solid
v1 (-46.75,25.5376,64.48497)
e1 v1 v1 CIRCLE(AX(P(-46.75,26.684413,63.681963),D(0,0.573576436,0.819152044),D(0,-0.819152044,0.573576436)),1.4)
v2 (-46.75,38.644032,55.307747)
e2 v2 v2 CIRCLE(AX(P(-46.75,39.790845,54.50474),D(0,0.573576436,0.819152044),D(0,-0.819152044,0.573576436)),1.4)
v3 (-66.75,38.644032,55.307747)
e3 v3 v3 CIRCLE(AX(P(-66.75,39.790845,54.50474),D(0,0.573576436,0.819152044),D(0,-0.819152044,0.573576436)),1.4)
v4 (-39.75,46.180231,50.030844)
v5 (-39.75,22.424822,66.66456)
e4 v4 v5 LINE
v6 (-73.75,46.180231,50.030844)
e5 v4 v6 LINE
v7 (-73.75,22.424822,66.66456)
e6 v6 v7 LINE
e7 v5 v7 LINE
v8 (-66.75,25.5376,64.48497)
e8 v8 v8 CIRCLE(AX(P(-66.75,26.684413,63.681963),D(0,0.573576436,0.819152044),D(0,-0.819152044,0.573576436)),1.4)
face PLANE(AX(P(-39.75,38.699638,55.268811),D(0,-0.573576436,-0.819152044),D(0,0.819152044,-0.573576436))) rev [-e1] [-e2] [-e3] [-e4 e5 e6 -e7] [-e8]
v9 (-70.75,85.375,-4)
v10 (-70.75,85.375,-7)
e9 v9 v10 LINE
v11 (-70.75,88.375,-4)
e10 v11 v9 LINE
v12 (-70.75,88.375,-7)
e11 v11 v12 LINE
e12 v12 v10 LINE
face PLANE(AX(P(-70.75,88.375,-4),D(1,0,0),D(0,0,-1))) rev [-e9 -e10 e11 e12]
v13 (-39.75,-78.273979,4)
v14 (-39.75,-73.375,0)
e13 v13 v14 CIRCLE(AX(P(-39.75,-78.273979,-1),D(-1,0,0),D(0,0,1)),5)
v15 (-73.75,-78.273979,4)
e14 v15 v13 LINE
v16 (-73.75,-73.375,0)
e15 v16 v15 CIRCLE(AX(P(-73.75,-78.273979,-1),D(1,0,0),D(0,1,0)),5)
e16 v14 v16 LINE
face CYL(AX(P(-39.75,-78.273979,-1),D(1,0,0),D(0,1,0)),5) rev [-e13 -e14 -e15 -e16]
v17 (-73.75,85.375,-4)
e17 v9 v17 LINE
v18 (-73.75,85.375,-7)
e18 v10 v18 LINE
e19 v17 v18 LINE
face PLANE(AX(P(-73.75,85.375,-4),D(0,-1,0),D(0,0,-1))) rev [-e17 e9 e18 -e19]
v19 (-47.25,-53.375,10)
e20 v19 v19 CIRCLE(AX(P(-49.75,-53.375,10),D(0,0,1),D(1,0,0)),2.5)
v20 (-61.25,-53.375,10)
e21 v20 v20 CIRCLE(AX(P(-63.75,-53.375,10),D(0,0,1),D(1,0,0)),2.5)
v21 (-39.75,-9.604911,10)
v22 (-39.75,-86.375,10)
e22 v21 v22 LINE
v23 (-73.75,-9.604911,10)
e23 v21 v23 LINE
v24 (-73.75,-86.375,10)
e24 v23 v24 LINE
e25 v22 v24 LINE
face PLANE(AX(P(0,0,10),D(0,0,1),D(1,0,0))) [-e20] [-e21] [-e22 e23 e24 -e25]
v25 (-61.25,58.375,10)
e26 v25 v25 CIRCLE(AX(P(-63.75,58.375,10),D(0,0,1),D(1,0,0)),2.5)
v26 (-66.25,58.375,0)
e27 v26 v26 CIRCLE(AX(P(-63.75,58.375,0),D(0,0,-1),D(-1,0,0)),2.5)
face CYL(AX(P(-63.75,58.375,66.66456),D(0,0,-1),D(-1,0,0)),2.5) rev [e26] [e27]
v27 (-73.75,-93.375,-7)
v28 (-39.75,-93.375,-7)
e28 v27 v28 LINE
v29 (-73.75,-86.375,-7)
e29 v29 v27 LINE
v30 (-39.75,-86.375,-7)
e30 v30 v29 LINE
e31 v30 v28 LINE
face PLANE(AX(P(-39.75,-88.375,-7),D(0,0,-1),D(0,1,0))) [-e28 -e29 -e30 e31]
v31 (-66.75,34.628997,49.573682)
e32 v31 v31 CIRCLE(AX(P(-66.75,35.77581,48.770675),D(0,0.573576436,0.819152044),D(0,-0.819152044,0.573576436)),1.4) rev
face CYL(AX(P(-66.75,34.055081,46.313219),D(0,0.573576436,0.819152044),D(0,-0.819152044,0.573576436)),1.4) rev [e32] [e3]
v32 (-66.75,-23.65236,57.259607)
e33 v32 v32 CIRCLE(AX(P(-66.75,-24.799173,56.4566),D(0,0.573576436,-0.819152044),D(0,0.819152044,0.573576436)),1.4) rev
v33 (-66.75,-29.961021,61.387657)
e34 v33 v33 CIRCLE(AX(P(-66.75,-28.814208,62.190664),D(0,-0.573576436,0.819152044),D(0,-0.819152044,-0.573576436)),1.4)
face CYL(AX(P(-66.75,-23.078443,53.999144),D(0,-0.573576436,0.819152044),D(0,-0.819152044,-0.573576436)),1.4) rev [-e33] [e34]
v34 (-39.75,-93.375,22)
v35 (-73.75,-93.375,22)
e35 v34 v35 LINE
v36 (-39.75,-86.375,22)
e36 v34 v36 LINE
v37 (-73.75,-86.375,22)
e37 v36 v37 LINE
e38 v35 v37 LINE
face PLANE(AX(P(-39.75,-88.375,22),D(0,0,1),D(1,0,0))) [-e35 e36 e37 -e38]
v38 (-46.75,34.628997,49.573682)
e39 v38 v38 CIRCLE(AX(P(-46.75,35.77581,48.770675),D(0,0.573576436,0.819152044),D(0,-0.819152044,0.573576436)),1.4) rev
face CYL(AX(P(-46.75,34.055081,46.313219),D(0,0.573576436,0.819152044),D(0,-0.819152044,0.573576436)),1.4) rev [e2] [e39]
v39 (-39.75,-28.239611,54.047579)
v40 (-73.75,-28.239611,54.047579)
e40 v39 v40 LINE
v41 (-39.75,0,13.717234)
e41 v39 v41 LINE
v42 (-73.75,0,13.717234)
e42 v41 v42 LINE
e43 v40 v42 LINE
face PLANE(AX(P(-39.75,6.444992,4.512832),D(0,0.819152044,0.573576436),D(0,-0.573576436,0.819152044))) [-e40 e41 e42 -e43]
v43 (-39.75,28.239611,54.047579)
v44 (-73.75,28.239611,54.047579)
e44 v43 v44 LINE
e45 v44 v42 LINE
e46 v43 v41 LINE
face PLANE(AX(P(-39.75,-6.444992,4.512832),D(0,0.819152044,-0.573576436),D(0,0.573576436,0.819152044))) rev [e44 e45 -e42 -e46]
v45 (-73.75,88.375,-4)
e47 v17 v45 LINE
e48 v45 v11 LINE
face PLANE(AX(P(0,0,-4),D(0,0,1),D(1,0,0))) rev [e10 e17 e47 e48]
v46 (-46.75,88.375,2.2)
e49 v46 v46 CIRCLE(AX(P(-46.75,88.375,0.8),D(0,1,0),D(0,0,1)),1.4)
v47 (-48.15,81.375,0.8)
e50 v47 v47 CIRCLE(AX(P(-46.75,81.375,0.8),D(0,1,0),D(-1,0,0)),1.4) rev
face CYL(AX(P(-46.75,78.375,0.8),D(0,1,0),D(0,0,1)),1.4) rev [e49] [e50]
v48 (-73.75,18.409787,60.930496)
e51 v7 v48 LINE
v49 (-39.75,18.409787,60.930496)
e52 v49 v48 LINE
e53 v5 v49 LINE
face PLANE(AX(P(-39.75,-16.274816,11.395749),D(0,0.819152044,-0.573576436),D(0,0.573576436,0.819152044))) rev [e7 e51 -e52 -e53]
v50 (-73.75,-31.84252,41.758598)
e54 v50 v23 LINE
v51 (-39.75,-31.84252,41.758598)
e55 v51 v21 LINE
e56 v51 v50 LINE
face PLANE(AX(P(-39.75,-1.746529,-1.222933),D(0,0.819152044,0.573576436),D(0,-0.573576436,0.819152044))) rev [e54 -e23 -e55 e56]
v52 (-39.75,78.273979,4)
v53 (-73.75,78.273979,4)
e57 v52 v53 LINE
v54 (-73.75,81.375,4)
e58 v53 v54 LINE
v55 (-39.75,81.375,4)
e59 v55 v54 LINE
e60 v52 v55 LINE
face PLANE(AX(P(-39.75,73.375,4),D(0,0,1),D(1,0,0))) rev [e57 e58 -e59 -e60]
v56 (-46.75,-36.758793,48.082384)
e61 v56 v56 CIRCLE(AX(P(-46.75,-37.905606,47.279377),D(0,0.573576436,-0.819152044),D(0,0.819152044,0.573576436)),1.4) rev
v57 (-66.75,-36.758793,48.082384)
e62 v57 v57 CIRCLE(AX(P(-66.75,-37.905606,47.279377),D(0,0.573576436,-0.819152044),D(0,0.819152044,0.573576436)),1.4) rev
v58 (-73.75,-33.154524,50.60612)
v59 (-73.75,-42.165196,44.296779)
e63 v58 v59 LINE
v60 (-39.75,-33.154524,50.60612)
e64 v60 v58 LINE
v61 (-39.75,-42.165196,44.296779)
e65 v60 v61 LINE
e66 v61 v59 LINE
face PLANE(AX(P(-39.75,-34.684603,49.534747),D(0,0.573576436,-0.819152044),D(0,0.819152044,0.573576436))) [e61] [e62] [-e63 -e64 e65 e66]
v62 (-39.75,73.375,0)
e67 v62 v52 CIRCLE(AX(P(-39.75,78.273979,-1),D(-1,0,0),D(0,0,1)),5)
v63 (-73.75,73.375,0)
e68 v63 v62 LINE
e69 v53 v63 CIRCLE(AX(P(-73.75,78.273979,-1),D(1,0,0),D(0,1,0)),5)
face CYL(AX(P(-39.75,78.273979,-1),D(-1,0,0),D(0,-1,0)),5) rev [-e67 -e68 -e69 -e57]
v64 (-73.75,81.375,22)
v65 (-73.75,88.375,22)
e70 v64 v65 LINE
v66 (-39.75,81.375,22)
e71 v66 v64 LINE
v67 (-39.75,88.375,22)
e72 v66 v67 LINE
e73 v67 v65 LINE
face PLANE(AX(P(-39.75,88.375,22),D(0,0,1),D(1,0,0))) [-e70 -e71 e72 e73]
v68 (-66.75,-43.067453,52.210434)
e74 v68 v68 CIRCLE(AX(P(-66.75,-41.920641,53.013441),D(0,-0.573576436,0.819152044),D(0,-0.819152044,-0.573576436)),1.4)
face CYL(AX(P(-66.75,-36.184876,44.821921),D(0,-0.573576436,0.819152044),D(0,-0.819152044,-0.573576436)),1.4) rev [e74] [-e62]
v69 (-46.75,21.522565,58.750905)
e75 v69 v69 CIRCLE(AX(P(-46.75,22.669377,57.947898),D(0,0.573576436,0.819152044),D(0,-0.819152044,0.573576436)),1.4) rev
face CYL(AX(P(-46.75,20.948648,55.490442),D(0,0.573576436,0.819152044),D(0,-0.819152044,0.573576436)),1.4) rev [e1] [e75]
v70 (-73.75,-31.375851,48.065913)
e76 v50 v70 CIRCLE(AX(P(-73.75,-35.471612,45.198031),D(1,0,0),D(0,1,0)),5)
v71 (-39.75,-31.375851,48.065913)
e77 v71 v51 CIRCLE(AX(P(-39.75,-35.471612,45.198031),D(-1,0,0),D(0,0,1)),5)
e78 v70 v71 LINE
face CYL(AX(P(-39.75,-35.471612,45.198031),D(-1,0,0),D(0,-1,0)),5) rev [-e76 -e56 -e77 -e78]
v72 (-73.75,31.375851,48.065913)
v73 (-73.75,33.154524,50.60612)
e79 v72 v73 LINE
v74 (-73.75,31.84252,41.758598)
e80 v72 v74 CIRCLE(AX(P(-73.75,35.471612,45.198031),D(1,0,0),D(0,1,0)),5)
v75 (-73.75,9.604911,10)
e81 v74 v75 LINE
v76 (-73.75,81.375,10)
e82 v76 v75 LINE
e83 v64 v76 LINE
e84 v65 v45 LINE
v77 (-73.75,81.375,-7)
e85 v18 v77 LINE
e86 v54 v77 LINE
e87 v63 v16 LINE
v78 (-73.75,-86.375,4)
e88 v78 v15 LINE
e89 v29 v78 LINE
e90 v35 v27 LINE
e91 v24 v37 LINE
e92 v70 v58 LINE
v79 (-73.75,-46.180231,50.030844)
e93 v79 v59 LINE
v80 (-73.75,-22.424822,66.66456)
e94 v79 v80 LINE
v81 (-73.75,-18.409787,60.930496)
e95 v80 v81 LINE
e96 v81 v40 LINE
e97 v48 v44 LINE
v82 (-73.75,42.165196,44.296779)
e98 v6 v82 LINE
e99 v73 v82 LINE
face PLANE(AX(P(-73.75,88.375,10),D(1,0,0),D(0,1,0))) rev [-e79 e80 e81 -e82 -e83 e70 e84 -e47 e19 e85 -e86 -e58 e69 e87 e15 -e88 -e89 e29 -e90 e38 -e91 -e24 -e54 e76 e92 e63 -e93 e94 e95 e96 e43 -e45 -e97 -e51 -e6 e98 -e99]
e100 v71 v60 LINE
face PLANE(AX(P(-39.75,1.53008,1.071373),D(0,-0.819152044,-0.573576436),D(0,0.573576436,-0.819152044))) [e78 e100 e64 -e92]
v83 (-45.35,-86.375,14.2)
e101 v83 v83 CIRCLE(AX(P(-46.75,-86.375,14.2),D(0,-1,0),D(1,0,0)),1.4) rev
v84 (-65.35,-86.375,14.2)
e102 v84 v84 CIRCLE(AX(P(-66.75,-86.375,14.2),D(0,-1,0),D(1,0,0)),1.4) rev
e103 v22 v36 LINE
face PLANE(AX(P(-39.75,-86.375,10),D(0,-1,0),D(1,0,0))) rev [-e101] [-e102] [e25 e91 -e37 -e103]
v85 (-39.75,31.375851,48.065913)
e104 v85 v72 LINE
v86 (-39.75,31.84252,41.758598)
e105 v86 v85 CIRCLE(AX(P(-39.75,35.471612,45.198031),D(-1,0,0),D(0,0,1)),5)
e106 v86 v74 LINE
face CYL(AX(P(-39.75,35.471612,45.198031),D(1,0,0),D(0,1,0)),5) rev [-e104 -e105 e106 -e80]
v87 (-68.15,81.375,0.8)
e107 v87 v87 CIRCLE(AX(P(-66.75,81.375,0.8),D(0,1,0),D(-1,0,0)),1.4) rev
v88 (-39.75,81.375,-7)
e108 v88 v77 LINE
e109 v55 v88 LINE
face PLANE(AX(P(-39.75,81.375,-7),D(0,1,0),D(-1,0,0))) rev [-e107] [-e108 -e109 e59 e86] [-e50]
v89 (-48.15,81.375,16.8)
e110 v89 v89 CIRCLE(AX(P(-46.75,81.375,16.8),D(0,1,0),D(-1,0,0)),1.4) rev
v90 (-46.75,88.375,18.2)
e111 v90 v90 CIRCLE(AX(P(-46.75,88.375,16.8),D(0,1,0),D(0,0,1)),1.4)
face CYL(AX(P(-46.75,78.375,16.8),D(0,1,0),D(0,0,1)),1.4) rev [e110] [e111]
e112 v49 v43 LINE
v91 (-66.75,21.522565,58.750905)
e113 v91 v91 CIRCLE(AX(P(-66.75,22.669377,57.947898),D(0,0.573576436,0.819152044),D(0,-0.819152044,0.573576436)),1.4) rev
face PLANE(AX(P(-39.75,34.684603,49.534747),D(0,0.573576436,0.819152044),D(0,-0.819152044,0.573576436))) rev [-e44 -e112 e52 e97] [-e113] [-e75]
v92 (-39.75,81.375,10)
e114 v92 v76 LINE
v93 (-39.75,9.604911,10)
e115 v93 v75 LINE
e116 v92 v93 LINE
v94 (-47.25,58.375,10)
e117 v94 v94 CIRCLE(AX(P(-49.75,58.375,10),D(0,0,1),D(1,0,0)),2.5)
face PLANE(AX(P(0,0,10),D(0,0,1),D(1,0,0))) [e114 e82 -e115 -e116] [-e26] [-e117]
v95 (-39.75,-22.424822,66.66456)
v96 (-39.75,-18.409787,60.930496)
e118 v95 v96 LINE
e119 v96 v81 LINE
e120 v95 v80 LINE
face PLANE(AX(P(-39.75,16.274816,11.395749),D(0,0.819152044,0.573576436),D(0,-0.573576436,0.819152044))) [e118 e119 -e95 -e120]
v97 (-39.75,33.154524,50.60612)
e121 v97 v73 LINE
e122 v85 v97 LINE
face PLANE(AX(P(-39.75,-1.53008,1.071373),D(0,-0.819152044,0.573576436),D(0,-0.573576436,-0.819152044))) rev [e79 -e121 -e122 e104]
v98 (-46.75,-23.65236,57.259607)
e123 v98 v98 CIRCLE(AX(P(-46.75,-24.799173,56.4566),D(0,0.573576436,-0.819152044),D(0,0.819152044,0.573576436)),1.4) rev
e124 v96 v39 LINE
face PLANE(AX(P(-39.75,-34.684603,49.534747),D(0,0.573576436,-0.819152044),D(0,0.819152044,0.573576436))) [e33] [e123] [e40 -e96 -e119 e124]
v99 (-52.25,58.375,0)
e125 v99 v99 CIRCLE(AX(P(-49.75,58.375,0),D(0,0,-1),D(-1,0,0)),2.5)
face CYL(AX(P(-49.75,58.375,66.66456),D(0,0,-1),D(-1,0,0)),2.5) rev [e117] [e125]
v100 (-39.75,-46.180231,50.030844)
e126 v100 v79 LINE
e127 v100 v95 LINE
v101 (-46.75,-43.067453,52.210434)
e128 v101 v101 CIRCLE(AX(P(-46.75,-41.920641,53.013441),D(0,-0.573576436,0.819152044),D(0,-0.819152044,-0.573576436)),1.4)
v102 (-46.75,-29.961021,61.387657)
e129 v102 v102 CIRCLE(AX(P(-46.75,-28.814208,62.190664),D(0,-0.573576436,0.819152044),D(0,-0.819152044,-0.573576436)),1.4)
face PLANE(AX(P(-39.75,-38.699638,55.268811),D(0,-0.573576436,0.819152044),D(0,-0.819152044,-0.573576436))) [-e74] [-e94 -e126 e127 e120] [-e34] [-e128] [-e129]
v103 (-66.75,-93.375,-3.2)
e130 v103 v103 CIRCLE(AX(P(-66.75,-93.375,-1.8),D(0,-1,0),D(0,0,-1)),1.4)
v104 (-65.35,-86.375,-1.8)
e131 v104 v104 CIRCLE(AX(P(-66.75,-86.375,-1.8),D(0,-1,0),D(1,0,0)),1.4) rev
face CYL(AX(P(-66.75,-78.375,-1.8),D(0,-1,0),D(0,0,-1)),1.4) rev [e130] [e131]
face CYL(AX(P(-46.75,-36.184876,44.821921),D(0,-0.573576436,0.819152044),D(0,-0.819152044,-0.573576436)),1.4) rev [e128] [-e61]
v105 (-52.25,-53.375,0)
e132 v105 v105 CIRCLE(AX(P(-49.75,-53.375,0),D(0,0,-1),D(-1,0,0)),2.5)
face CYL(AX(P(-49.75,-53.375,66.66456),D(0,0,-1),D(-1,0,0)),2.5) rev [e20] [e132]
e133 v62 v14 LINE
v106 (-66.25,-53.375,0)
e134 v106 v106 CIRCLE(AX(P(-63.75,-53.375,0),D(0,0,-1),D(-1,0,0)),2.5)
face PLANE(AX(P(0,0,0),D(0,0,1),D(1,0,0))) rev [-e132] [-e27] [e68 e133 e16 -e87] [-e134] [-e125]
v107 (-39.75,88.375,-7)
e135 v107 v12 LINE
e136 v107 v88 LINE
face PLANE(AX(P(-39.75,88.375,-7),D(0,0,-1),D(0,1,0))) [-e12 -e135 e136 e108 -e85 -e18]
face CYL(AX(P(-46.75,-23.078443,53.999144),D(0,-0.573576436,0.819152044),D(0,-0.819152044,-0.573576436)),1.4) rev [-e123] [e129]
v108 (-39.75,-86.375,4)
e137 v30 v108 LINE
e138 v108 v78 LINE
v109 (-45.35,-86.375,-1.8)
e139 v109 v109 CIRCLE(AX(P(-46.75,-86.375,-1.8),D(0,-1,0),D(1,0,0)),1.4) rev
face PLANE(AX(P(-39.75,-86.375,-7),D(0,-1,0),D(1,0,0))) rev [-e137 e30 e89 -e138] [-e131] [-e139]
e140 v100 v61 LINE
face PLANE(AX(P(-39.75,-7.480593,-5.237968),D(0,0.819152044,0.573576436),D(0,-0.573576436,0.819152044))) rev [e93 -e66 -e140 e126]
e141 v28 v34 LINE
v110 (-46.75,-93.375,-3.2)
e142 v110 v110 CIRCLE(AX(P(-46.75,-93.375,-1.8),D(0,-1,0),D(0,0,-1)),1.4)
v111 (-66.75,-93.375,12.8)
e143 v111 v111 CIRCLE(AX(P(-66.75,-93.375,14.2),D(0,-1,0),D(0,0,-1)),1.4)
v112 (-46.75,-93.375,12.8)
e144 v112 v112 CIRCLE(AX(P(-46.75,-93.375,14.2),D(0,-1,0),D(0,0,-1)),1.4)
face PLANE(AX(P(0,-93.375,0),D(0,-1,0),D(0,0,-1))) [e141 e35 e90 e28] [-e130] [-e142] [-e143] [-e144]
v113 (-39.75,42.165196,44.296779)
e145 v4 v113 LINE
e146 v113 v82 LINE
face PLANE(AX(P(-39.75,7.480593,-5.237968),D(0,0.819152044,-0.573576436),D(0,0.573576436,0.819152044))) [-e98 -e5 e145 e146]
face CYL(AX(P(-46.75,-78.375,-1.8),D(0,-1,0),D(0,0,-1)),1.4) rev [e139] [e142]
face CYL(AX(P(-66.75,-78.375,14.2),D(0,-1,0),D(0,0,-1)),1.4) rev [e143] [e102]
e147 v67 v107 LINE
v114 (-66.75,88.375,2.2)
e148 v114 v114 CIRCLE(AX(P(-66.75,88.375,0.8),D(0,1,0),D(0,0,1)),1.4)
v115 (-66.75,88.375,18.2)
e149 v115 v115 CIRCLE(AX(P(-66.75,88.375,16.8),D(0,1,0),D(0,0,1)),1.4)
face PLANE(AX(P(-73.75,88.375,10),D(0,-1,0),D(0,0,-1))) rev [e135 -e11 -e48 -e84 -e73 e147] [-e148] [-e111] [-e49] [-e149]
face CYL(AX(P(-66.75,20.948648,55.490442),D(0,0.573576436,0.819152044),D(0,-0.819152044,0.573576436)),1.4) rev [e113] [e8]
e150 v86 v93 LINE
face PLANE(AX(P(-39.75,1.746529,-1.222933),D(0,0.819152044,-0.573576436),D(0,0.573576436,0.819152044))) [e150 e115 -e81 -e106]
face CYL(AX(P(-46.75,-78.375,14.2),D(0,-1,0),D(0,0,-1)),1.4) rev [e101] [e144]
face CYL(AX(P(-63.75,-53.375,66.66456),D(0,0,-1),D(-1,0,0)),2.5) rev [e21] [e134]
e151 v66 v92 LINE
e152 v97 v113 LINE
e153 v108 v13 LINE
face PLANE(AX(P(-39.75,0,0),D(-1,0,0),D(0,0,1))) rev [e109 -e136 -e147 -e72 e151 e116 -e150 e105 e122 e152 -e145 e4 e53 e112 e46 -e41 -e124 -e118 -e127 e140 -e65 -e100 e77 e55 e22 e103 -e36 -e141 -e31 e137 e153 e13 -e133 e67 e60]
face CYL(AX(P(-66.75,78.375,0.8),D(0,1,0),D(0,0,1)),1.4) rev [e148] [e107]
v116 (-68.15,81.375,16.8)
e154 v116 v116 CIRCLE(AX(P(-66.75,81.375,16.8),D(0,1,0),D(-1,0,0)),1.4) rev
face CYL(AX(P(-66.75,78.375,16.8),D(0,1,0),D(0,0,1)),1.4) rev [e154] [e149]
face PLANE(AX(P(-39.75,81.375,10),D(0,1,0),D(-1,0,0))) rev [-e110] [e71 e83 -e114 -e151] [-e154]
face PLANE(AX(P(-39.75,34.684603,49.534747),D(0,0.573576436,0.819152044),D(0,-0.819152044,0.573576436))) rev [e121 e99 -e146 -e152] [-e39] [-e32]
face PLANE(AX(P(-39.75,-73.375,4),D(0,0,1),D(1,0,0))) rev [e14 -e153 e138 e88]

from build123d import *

# Parameters (mm, degrees)
SKETCH2_W           = 147.5
SKETCH2_H           = 176.75
BOSS_EXTRUDE1_DEPTH = 10
SKETCH3_W           = 29
SKETCH3_H           = 15
BOSS_EXTRUDE2_DEPTH = 34
BOSS_EXTRUDE3_DEPTH = 34
SKETCH8_W           = 113.5
SKETCH8_H           = 176.75
CUT_EXTRUDE1_DEPTH  = 30
SKETCH9_R           = 2.5
CUT_EXTRUDE2_DEPTH  = 134.016415209
SKETCH10_W          = 3
SKETCH10_H          = 3
CUT_EXTRUDE3_DEPTH  = 3
SKETCH11_R          = 1.4
CUT_EXTRUDE4_DEPTH  = 10
SKETCH12_R          = 1.4
CUT_EXTRUDE5_DEPTH  = 10
SKETCH13_R          = 1.4
CUT_EXTRUDE6_DEPTH  = 10
SKETCH14_R          = 1.4
CUT_EXTRUDE7_DEPTH  = 10
SKETCH15_W          = 11
SKETCH15_H          = 8
SKETCH15_W_2        = 12
CUT_EXTRUDE8_DEPTH  = 116.802867905
CUT_EXTRUDE9_DEPTH  = 116.802867905
FILLET1_R           = 5
BOSS_EXTRUDE4_START = 5
SKETCH17_W          = 34
SKETCH17_H          = 29
SKETCH17_R          = 1.4
BOSS_EXTRUDE4_DEPTH = 5
SKETCH18_W          = 11
SKETCH18_H          = 5
SKETCH18_W_2        = 12
CUT_EXTRUDE10_DEPTH = 120.662250585


with BuildPart() as part:
    # Sketch2 → Boss-Extrude1 (new body)
    with BuildSketch(Plane.XY):
        Rectangle(SKETCH2_W, SKETCH2_H)
    extrude(amount=BOSS_EXTRUDE1_DEPTH)

    # Sketch3 → Boss-Extrude2 (add)
    with BuildSketch(Plane.ZY.offset(73.75)):
        with Locations((7.5, 80.875)):
            Rectangle(SKETCH3_W, SKETCH3_H)
        with Locations((7.5, -80.875)):
            Rectangle(SKETCH3_W, SKETCH3_H)
    boss_extrude2 = extrude(amount=-BOSS_EXTRUDE2_DEPTH)

    # Mirror1: Boss-Extrude2 across plane
    add(boss_extrude2.mirror(Plane(origin=(0, 0, 0), x_dir=(0, 0, 1), z_dir=(1, 0, 0))))

    # Sketch5 → Boss-Extrude3 (add)
    with BuildSketch(Plane.ZY.offset(73.75)):
        Polygon((13.717233978, 0), (47.494362324, 23.650999887), (54.37727956, 13.821175356), (66.664560225, 22.424821901), (50.030843571, 46.180231185), (37.743562906, 37.57658464), (41.758597961, 31.84252033), (10, 9.604910635), (10, -9.604910635), (41.758597961, -31.84252033), (37.743562906, -37.57658464), (50.030843571, -46.180231185), (66.664560225, -22.424821901), (54.37727956, -13.821175356), (47.494362324, -23.650999887), align=None)
    extrude(amount=-BOSS_EXTRUDE3_DEPTH)

    # Sketch8 → Cut-Extrude1 (cut)
    with BuildSketch(Plane.XY.offset(22)):
        with Locations((17, 0)):
            Rectangle(SKETCH8_W, SKETCH8_H)
    extrude(amount=-CUT_EXTRUDE1_DEPTH, mode=Mode.SUBTRACT)

    # Sketch9 → Cut-Extrude2 (cut, through all)
    with BuildSketch(Plane(origin=(0, 0, 0), x_dir=(-1, 0, 0), z_dir=(0, 0, -1))):
        with Locations((49.75, 58.375)):
            Circle(SKETCH9_R)
        with Locations((63.75, 58.375)):
            Circle(SKETCH9_R)
        with Locations((49.75, -53.375)):
            Circle(SKETCH9_R)
        with Locations((63.75, -53.375)):
            Circle(SKETCH9_R)
    extrude(amount=-CUT_EXTRUDE2_DEPTH, mode=Mode.SUBTRACT)

    # Sketch10 → Cut-Extrude3 (cut)
    with BuildSketch(Plane(origin=(0, 0, -7), x_dir=(-1, 0, 0), z_dir=(0, 0, -1))):
        with Locations((72.25, 86.875)):
            Rectangle(SKETCH10_W, SKETCH10_H)
    extrude(amount=-CUT_EXTRUDE3_DEPTH, mode=Mode.SUBTRACT)

    # Sketch11 → Cut-Extrude4 (cut)
    with BuildSketch(Plane(origin=(0, 88.375, 0), x_dir=(1, 0, 0), z_dir=(0, 1, 0))):
        with Locations(Location((-46.75, -16.8, 0), (0, 0, 270))):
            Circle(SKETCH11_R)
        with Locations(Location((-66.75, -16.8, 0), (0, 0, 270))):
            Circle(SKETCH11_R)
        with Locations(Location((-66.75, -0.8, 0), (0, 0, 270))):
            Circle(SKETCH11_R)
        with Locations(Location((-46.75, -0.8, 0), (0, 0, 270))):
            Circle(SKETCH11_R)
    extrude(amount=-CUT_EXTRUDE4_DEPTH, mode=Mode.SUBTRACT)

    # Sketch12 → Cut-Extrude5 (cut)
    with BuildSketch(Plane.XZ.offset(88.375)):
        with Locations(Location((-46.75, -1.8, 0), (0, 0, 270))):
            Circle(SKETCH12_R)
        with Locations(Location((-66.75, -1.8, 0), (0, 0, 270))):
            Circle(SKETCH12_R)
        with Locations(Location((-66.75, 14.2, 0), (0, 0, 270))):
            Circle(SKETCH12_R)
        with Locations(Location((-46.75, 14.2, 0), (0, 0, 270))):
            Circle(SKETCH12_R)
    extrude(amount=-CUT_EXTRUDE5_DEPTH, mode=Mode.SUBTRACT)

    # Sketch13 → Cut-Extrude6 (cut)
    with BuildSketch(Plane(origin=(0, 38.699638206, 55.268811165), x_dir=(1, 0, 0), z_dir=(0, 0.5735764363510447, 0.8191520442889927))):
        with Locations(Location((-46.75, -14.667882182, 0), (0, 0, 270))):
            Circle(SKETCH13_R)
        with Locations(Location((-66.75, -14.667882182, 0), (0, 0, 270))):
            Circle(SKETCH13_R)
        with Locations(Location((-66.75, 1.332117818, 0), (0, 0, 270))):
            Circle(SKETCH13_R)
        with Locations(Location((-46.75, 1.332117818, 0), (0, 0, 270))):
            Circle(SKETCH13_R)
    extrude(amount=-CUT_EXTRUDE6_DEPTH, mode=Mode.SUBTRACT)

    # Sketch14 → Cut-Extrude7 (cut)
    with BuildSketch(Plane(origin=(0, -38.699638206, 55.268811165), x_dir=(1, 0, 0), z_dir=(0, -0.5735764363510447, 0.8191520442889929))):
        with Locations(Location((-46.75, -3.932117818, 0), (0, 0, 270))):
            Circle(SKETCH14_R)
        with Locations(Location((-66.75, -3.932117818, 0), (0, 0, 270))):
            Circle(SKETCH14_R)
        with Locations(Location((-66.75, 12.067882182, 0), (0, 0, 270))):
            Circle(SKETCH14_R)
        with Locations(Location((-46.75, 12.067882182, 0), (0, 0, 270))):
            Circle(SKETCH14_R)
    extrude(amount=-CUT_EXTRUDE7_DEPTH, mode=Mode.SUBTRACT)

    # Sketch15 → Cut-Extrude8 (cut, through all)
    with BuildSketch(Plane.ZY.offset(73.75)):
        with Locations((-1.5, 77.375)):
            Rectangle(SKETCH15_W, SKETCH15_H)
        with Locations((16, 77.375)):
            Rectangle(SKETCH15_W_2, SKETCH15_H)
        with Locations((16, -77.375)):
            Rectangle(SKETCH15_W_2, SKETCH15_H)
        with Locations((-1.5, -77.375)):
            Rectangle(SKETCH15_W, SKETCH15_H)
    extrude(amount=-CUT_EXTRUDE8_DEPTH, mode=Mode.SUBTRACT)

    # Sketch16 → Cut-Extrude9 (cut, through all)
    with BuildSketch(Plane.ZY.offset(73.75)):
        Polygon((37.743562906, 37.57658464), (41.758597961, 31.84252033), (44.052903706, 28.565912153), (50.60612006, 33.154523644), (44.296779261, 42.165196131), align=None)
        Polygon((54.047578679, 28.239611378), (47.494362324, 23.650999887), (54.37727956, 13.821175356), (60.930495915, 18.409786846), align=None)
        Polygon((47.494362324, -23.650999887), (54.047578679, -28.239611378), (60.930495915, -18.409786846), (54.37727956, -13.821175356), align=None)
        Polygon((37.743562906, -37.57658464), (44.296779261, -42.165196131), (50.60612006, -33.154523644), (44.052903706, -28.565912153), (41.758597961, -31.84252033), align=None)
    extrude(amount=-CUT_EXTRUDE9_DEPTH, mode=Mode.SUBTRACT)

    # Fillet1
    # the kernel refuses this fillet: 5 mm, written as the material it adds along each edge
    with BuildSketch(Plane(origin=(-73.75, -73.375, 4), x_dir=(0, -1, 0), z_dir=(1, 0, 0)), Plane(origin=(-73.75, -28.565912153, 44.052903706), x_dir=(0, -0.5735764363510428, 0.819152044288994), z_dir=(1, 0, 0))) as fillet1_piece_1:
        with BuildLine():
            CenterArc((4.898979486, 5), FILLET1_R, 191.536959033, 78.463040967)
            Line((0, 4), (-0.09797959, 3.98))
            ThreePointArc((-0.09797959, 3.98), (-0.1, 2), (-0.1, 0))
            Line((-0.1, 0), (0, -0.1))
            Line((0, -0.1), (4.898979486, -0.1))
            Line((4.898979486, -0.1), (4.898979486, 0))
        make_face()
    extrude(amount=34)
    with BuildSketch(Plane(origin=(-73.75, 28.565912153, 44.052903706), x_dir=(0, 0.8191520442898707, -0.5735764363497912), z_dir=(1, 0, 0))) as fillet1_piece_2:
        with BuildLine():
            CenterArc((5, 4.898979486), FILLET1_R, 180, 78.463040967)
            Line((0, 4.898979486), (-0.1, 4.898979486))
            Line((-0.1, 4.898979486), (-0.1, 0))
            Line((-0.1, 0), (0, -0.1))
            ThreePointArc((0, -0.1), (2, -0.1), (3.98, -0.09797959))
            Line((3.98, -0.09797959), (4, 0))
        make_face()
    extrude(amount=34)
    with BuildSketch(Plane(origin=(-73.75, 73.375, 4), x_dir=(0, 1, 0), z_dir=(1, 0, 0))) as fillet1_piece_3:
        with BuildLine():
            CenterArc((4.898979486, -5), FILLET1_R, 90, 78.463040967)
            Line((0, -4), (-0.09797959, -3.98))
            ThreePointArc((-0.09797959, -3.98), (-0.1, -2), (-0.1, 0))
            Line((-0.1, 0), (0, 0.1))
            Line((0, 0.1), (4.898979486, 0.1))
            Line((4.898979486, 0.1), (4.898979486, 0))
        make_face()
    extrude(amount=34)

    # Sketch17 → Boss-Extrude4 (add)
    with BuildSketch(Plane.XZ.offset(88.375).offset(BOSS_EXTRUDE4_START)):
        with Locations((-56.75, 7.5)):
            Rectangle(SKETCH17_W, SKETCH17_H)
        with Locations(Location((-66.75, 14.2, 0), (0, 0, 270))):
            Circle(SKETCH17_R, mode=Mode.SUBTRACT)
        with Locations(Location((-46.75, 14.2, 0), (0, 0, 270))):
            Circle(SKETCH17_R, mode=Mode.SUBTRACT)
        with Locations(Location((-46.75, -1.8, 0), (0, 0, 270))):
            Circle(SKETCH17_R, mode=Mode.SUBTRACT)
        with Locations(Location((-66.75, -1.8, 0), (0, 0, 270))):
            Circle(SKETCH17_R, mode=Mode.SUBTRACT)
    extrude(amount=-BOSS_EXTRUDE4_DEPTH)

    # Sketch18 → Cut-Extrude10 (cut, through all)
    with BuildSketch(Plane.ZY.offset(73.75)):
        with Locations((-1.5, -83.875)):
            Rectangle(SKETCH18_W, SKETCH18_H)
        with Locations((16, -83.875)):
            Rectangle(SKETCH18_W_2, SKETCH18_H)
    extrude(amount=-CUT_EXTRUDE10_DEPTH, mode=Mode.SUBTRACT)


solid = part.part
